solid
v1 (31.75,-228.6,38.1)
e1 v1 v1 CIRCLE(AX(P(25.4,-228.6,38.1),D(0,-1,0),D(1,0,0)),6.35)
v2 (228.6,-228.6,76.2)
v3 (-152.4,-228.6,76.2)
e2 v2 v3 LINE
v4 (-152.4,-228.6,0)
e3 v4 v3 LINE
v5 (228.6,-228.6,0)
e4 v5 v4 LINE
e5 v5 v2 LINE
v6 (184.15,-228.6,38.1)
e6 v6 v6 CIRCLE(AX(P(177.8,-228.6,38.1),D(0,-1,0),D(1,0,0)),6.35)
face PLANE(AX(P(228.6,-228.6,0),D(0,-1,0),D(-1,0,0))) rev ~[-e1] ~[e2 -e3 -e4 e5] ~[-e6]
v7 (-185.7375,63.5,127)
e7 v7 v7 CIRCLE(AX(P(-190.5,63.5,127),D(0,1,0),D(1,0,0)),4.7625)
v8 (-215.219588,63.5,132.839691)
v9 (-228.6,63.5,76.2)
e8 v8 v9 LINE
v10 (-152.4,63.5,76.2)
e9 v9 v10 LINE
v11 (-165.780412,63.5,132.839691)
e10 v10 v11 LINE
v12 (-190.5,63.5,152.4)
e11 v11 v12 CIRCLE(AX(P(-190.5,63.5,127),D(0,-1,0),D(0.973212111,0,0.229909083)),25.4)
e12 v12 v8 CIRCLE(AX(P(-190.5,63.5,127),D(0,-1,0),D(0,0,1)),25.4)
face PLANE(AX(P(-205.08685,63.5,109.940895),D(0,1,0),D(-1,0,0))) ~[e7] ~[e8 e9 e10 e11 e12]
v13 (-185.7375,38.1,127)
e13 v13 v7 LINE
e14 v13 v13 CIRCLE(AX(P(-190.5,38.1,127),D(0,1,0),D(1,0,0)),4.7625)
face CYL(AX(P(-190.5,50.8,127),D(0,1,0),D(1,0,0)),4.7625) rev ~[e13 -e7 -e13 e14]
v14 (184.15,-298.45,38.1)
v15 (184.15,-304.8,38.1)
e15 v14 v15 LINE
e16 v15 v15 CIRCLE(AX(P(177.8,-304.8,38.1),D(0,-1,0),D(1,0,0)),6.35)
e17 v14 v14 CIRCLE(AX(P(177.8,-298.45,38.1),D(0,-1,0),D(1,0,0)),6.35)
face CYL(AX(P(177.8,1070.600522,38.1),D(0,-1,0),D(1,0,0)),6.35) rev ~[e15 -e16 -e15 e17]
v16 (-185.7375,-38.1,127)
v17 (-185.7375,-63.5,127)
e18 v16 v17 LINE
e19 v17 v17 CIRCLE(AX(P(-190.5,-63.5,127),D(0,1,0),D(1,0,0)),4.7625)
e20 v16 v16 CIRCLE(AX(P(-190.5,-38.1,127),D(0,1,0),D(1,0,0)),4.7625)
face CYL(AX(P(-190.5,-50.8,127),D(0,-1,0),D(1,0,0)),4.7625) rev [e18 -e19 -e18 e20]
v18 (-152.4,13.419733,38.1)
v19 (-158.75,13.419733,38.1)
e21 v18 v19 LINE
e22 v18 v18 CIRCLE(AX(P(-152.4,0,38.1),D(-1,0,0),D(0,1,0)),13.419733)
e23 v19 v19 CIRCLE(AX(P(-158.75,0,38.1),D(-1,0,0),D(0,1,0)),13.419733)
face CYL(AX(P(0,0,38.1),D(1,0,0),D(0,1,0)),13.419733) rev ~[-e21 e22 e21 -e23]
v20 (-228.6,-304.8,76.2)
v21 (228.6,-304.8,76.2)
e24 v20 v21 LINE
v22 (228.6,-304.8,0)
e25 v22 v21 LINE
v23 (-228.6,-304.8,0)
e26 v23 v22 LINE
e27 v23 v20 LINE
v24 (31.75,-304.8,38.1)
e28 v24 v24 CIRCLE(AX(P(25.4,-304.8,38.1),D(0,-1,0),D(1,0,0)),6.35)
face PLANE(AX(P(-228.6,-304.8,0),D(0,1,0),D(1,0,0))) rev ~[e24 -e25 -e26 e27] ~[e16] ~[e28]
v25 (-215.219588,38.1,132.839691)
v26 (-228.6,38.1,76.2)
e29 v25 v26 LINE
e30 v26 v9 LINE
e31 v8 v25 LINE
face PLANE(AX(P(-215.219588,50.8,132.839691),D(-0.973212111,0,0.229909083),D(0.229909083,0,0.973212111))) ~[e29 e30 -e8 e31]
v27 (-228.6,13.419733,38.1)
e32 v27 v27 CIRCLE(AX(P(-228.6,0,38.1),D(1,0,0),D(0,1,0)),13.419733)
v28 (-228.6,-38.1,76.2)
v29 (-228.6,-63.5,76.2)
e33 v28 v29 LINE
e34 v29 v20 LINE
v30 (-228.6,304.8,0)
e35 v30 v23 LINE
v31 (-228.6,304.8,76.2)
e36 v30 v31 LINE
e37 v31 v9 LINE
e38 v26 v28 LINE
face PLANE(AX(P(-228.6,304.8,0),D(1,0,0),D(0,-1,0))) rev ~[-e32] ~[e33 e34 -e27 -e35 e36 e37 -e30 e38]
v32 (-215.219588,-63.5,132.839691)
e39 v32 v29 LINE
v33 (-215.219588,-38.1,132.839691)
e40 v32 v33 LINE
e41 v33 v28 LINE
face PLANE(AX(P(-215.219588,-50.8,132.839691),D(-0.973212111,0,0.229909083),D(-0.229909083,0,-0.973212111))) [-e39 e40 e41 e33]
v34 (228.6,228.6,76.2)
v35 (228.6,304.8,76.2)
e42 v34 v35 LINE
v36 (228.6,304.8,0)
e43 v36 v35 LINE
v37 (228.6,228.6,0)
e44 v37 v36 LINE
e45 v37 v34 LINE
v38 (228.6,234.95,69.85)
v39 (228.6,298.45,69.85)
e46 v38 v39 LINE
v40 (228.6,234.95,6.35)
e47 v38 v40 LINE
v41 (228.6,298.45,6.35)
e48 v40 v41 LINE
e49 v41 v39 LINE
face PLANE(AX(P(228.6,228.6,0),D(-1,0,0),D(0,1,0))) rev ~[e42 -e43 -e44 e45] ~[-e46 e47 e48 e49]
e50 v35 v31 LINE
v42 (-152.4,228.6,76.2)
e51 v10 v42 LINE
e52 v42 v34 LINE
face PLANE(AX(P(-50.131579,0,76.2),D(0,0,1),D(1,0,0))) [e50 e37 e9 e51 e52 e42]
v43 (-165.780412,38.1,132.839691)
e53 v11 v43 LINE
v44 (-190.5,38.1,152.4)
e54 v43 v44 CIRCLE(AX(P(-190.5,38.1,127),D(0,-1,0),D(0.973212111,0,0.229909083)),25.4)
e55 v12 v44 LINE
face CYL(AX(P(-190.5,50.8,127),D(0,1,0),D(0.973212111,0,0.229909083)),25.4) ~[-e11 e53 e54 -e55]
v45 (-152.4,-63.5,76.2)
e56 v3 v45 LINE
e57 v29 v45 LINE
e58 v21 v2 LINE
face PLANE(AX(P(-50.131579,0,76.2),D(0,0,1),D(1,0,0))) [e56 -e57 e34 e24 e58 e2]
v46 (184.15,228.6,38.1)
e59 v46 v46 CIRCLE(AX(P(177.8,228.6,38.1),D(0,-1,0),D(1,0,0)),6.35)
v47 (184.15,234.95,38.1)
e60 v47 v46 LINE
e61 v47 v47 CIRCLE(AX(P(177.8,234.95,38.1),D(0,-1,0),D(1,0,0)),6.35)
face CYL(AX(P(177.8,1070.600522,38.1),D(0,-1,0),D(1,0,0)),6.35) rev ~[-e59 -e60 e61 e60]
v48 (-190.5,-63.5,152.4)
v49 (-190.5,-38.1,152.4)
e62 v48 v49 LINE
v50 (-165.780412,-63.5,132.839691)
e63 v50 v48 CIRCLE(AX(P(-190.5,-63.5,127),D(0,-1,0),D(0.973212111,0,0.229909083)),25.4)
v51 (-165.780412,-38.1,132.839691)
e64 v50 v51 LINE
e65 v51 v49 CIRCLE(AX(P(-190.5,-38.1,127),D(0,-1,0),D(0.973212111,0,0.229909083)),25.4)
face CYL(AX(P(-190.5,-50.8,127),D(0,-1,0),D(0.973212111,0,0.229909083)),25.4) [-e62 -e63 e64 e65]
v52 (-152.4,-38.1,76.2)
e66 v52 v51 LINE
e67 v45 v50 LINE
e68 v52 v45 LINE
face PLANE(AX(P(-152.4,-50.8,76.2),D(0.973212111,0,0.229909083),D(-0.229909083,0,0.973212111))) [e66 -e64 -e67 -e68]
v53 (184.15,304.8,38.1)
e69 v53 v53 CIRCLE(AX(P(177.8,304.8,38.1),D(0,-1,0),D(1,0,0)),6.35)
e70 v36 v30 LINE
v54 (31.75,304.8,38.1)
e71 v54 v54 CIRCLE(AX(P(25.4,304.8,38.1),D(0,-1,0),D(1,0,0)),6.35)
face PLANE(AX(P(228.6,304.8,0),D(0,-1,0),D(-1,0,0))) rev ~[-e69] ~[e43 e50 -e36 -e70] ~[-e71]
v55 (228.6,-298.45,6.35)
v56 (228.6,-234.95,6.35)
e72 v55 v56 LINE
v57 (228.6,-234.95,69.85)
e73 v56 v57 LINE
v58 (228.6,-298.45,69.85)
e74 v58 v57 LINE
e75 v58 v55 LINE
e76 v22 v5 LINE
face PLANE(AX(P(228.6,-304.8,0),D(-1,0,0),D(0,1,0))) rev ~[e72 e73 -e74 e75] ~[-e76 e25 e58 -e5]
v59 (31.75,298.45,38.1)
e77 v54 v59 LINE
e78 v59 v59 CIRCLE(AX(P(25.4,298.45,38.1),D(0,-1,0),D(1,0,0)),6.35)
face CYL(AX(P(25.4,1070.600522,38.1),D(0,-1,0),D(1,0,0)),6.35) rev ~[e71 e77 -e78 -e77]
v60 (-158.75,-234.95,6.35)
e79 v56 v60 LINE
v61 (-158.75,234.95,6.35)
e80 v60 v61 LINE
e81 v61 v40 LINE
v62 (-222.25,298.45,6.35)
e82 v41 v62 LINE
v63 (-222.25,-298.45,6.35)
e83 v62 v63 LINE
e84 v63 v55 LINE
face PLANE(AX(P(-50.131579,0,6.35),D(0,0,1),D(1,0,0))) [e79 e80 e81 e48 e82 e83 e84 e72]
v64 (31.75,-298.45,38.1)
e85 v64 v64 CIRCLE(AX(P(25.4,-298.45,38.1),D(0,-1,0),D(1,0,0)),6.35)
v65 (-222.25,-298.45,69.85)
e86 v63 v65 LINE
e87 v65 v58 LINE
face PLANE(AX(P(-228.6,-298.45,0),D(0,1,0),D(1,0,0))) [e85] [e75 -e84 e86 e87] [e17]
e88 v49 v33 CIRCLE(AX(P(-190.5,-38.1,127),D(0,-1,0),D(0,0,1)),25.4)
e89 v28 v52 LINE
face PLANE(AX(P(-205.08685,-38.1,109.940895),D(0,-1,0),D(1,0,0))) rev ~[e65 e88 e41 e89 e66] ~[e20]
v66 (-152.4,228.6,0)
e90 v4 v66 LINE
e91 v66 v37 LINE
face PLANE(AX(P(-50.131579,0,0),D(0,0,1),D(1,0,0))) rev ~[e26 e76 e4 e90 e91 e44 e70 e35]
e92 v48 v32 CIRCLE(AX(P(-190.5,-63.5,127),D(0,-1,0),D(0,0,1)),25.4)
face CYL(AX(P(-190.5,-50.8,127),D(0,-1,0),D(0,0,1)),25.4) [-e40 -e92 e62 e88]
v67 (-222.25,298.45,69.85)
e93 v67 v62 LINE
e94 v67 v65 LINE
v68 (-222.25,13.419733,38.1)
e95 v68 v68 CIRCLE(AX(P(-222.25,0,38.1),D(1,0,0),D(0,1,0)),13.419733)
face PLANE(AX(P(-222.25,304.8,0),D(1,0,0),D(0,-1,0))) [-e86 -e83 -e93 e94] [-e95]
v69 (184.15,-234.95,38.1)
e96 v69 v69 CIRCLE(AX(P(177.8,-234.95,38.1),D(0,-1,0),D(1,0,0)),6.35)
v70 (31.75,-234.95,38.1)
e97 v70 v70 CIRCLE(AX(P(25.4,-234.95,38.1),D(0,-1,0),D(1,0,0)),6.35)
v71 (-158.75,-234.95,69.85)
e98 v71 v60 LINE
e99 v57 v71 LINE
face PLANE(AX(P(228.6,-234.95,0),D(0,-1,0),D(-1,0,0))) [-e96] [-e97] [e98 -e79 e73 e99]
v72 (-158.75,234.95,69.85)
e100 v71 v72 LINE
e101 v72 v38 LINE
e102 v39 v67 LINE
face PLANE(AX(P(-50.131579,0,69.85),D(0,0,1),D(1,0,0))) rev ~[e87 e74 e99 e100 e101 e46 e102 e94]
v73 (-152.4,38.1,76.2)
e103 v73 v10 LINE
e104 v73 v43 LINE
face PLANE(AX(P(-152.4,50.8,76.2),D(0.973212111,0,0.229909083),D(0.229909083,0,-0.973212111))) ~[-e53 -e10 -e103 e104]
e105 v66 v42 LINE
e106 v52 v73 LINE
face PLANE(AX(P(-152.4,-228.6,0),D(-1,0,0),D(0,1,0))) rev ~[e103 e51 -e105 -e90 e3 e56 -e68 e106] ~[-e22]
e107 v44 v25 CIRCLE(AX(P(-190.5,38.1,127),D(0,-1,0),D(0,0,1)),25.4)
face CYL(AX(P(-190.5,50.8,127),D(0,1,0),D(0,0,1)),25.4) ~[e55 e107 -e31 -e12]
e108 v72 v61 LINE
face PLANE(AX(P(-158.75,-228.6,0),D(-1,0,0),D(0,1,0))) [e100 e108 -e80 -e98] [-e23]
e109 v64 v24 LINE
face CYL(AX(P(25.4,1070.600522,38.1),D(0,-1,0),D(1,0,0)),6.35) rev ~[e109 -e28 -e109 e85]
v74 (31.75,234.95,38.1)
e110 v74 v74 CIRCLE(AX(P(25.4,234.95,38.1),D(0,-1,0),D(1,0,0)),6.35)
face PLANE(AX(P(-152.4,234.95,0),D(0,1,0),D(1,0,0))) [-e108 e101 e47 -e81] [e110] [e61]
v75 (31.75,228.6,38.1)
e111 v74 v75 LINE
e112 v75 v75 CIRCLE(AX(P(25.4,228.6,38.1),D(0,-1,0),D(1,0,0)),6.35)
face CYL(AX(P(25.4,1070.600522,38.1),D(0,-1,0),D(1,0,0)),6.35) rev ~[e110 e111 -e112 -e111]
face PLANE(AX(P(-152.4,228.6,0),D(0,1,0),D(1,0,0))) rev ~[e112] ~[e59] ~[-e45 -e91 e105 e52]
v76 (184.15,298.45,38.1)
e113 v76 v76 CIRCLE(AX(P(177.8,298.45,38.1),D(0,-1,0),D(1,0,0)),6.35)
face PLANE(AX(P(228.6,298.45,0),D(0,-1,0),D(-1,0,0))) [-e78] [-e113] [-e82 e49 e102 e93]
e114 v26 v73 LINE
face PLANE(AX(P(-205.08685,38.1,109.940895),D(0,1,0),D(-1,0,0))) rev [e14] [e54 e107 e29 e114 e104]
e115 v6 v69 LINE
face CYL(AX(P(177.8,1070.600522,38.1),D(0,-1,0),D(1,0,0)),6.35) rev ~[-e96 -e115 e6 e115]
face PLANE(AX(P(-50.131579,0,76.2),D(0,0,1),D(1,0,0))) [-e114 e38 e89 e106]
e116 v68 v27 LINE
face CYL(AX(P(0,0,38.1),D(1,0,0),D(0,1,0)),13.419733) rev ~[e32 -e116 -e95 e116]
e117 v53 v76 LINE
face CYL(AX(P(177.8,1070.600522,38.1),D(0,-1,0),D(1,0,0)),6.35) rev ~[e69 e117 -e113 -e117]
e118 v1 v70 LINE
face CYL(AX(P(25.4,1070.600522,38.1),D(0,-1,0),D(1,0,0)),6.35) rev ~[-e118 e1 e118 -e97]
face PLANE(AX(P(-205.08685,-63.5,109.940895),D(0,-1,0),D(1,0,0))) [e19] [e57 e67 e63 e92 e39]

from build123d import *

# Parameters (mm, degrees)
F1_DEPTH = 76.2
F2_T     = -6.35
F4_D     = 12.7
F7_DEPTH = 12.7
F8_R     = 13.4197326433
F9_DEPTH = 228.601


# Not quite as in the source:
# - a feature names something its author has since deleted; it is built from what else it names


with BuildPart() as f1:
    # F0 (on Top) → F1 (new body)
    with BuildSketch(Plane.XY):
        Polygon((-228.6, 304.8), (-228.6, -304.8), (228.6, -304.8), (228.6, -228.6), (-152.4, -228.6), (-152.4, 228.6), (228.6, 228.6), (228.6, 304.8), align=None)
    extrude(amount=F1_DEPTH)

    # F2
    f2_openings = [f1.faces().sort_by_distance(p)[0] for p in [
        (228.6, -266.7, 38.1),
        (228.6, 266.7, 38.1),
    ]]
    offset(amount=F2_T, openings=f2_openings, kind=Kind.INTERSECTION)

    # F4 (through all)
    with Locations(Plane(origin=(0, 304.8, 0), x_dir=(-1, 0, 0), z_dir=(0, 1, 0))):
        with Locations((-177.8, 38.1), (-25.4, 38.1)):
            Hole(F4_D / 2)

    # F6 (on offset) → F7 (join, symmetric)
    with BuildSketch(Plane.XZ.offset(50.8)):
        with BuildLine():
            Line((-215.2195876243, 132.8396907182), (-228.6, 76.2))
            Line((-228.6, 76.2), (-190.5, 76.2))
            Line((-190.5, 76.2), (-190.5, 122.2375))
            ThreePointArc((-190.5, 122.2375), (-195.2625, 127), (-190.5, 131.7625))
            Line((-190.5, 131.7625), (-190.5, 152.4))
            ThreePointArc((-190.5, 152.4), (-206.2612159391, 146.9184354838), (-215.2195876243, 132.8396907182))
        make_face()
        with BuildLine():
            Line((-190.5, 122.2375), (-190.5, 76.2))
            Line((-190.5, 76.2), (-152.4, 76.2))
            Line((-152.4, 76.2), (-165.7804123757, 132.8396907182))
            ThreePointArc((-165.7804123757, 132.8396907182), (-174.7387840609, 146.9184354838), (-190.5, 152.4))
            Line((-190.5, 152.4), (-190.5, 131.7625))
            ThreePointArc((-190.5, 131.7625), (-187.1324039546, 130.3675960454), (-185.7375, 127))
            ThreePointArc((-185.7375, 127), (-187.1324039546, 123.6324039546), (-190.5, 122.2375))
        make_face()
    extrude(amount=F7_DEPTH, both=True)

    # F8 (on Right) → F9 (cut, through all)
    with BuildSketch(Plane.YZ):
        with Locations((0, 38.1)):
            Circle(F8_R)
    extrude(amount=-F9_DEPTH, mode=Mode.SUBTRACT)

    # F10: F1 across plane


with BuildPart() as f1_1:
    add(f1.part)
    add(f1.part.mirror(Plane.XZ))


solid = f1_1.part
